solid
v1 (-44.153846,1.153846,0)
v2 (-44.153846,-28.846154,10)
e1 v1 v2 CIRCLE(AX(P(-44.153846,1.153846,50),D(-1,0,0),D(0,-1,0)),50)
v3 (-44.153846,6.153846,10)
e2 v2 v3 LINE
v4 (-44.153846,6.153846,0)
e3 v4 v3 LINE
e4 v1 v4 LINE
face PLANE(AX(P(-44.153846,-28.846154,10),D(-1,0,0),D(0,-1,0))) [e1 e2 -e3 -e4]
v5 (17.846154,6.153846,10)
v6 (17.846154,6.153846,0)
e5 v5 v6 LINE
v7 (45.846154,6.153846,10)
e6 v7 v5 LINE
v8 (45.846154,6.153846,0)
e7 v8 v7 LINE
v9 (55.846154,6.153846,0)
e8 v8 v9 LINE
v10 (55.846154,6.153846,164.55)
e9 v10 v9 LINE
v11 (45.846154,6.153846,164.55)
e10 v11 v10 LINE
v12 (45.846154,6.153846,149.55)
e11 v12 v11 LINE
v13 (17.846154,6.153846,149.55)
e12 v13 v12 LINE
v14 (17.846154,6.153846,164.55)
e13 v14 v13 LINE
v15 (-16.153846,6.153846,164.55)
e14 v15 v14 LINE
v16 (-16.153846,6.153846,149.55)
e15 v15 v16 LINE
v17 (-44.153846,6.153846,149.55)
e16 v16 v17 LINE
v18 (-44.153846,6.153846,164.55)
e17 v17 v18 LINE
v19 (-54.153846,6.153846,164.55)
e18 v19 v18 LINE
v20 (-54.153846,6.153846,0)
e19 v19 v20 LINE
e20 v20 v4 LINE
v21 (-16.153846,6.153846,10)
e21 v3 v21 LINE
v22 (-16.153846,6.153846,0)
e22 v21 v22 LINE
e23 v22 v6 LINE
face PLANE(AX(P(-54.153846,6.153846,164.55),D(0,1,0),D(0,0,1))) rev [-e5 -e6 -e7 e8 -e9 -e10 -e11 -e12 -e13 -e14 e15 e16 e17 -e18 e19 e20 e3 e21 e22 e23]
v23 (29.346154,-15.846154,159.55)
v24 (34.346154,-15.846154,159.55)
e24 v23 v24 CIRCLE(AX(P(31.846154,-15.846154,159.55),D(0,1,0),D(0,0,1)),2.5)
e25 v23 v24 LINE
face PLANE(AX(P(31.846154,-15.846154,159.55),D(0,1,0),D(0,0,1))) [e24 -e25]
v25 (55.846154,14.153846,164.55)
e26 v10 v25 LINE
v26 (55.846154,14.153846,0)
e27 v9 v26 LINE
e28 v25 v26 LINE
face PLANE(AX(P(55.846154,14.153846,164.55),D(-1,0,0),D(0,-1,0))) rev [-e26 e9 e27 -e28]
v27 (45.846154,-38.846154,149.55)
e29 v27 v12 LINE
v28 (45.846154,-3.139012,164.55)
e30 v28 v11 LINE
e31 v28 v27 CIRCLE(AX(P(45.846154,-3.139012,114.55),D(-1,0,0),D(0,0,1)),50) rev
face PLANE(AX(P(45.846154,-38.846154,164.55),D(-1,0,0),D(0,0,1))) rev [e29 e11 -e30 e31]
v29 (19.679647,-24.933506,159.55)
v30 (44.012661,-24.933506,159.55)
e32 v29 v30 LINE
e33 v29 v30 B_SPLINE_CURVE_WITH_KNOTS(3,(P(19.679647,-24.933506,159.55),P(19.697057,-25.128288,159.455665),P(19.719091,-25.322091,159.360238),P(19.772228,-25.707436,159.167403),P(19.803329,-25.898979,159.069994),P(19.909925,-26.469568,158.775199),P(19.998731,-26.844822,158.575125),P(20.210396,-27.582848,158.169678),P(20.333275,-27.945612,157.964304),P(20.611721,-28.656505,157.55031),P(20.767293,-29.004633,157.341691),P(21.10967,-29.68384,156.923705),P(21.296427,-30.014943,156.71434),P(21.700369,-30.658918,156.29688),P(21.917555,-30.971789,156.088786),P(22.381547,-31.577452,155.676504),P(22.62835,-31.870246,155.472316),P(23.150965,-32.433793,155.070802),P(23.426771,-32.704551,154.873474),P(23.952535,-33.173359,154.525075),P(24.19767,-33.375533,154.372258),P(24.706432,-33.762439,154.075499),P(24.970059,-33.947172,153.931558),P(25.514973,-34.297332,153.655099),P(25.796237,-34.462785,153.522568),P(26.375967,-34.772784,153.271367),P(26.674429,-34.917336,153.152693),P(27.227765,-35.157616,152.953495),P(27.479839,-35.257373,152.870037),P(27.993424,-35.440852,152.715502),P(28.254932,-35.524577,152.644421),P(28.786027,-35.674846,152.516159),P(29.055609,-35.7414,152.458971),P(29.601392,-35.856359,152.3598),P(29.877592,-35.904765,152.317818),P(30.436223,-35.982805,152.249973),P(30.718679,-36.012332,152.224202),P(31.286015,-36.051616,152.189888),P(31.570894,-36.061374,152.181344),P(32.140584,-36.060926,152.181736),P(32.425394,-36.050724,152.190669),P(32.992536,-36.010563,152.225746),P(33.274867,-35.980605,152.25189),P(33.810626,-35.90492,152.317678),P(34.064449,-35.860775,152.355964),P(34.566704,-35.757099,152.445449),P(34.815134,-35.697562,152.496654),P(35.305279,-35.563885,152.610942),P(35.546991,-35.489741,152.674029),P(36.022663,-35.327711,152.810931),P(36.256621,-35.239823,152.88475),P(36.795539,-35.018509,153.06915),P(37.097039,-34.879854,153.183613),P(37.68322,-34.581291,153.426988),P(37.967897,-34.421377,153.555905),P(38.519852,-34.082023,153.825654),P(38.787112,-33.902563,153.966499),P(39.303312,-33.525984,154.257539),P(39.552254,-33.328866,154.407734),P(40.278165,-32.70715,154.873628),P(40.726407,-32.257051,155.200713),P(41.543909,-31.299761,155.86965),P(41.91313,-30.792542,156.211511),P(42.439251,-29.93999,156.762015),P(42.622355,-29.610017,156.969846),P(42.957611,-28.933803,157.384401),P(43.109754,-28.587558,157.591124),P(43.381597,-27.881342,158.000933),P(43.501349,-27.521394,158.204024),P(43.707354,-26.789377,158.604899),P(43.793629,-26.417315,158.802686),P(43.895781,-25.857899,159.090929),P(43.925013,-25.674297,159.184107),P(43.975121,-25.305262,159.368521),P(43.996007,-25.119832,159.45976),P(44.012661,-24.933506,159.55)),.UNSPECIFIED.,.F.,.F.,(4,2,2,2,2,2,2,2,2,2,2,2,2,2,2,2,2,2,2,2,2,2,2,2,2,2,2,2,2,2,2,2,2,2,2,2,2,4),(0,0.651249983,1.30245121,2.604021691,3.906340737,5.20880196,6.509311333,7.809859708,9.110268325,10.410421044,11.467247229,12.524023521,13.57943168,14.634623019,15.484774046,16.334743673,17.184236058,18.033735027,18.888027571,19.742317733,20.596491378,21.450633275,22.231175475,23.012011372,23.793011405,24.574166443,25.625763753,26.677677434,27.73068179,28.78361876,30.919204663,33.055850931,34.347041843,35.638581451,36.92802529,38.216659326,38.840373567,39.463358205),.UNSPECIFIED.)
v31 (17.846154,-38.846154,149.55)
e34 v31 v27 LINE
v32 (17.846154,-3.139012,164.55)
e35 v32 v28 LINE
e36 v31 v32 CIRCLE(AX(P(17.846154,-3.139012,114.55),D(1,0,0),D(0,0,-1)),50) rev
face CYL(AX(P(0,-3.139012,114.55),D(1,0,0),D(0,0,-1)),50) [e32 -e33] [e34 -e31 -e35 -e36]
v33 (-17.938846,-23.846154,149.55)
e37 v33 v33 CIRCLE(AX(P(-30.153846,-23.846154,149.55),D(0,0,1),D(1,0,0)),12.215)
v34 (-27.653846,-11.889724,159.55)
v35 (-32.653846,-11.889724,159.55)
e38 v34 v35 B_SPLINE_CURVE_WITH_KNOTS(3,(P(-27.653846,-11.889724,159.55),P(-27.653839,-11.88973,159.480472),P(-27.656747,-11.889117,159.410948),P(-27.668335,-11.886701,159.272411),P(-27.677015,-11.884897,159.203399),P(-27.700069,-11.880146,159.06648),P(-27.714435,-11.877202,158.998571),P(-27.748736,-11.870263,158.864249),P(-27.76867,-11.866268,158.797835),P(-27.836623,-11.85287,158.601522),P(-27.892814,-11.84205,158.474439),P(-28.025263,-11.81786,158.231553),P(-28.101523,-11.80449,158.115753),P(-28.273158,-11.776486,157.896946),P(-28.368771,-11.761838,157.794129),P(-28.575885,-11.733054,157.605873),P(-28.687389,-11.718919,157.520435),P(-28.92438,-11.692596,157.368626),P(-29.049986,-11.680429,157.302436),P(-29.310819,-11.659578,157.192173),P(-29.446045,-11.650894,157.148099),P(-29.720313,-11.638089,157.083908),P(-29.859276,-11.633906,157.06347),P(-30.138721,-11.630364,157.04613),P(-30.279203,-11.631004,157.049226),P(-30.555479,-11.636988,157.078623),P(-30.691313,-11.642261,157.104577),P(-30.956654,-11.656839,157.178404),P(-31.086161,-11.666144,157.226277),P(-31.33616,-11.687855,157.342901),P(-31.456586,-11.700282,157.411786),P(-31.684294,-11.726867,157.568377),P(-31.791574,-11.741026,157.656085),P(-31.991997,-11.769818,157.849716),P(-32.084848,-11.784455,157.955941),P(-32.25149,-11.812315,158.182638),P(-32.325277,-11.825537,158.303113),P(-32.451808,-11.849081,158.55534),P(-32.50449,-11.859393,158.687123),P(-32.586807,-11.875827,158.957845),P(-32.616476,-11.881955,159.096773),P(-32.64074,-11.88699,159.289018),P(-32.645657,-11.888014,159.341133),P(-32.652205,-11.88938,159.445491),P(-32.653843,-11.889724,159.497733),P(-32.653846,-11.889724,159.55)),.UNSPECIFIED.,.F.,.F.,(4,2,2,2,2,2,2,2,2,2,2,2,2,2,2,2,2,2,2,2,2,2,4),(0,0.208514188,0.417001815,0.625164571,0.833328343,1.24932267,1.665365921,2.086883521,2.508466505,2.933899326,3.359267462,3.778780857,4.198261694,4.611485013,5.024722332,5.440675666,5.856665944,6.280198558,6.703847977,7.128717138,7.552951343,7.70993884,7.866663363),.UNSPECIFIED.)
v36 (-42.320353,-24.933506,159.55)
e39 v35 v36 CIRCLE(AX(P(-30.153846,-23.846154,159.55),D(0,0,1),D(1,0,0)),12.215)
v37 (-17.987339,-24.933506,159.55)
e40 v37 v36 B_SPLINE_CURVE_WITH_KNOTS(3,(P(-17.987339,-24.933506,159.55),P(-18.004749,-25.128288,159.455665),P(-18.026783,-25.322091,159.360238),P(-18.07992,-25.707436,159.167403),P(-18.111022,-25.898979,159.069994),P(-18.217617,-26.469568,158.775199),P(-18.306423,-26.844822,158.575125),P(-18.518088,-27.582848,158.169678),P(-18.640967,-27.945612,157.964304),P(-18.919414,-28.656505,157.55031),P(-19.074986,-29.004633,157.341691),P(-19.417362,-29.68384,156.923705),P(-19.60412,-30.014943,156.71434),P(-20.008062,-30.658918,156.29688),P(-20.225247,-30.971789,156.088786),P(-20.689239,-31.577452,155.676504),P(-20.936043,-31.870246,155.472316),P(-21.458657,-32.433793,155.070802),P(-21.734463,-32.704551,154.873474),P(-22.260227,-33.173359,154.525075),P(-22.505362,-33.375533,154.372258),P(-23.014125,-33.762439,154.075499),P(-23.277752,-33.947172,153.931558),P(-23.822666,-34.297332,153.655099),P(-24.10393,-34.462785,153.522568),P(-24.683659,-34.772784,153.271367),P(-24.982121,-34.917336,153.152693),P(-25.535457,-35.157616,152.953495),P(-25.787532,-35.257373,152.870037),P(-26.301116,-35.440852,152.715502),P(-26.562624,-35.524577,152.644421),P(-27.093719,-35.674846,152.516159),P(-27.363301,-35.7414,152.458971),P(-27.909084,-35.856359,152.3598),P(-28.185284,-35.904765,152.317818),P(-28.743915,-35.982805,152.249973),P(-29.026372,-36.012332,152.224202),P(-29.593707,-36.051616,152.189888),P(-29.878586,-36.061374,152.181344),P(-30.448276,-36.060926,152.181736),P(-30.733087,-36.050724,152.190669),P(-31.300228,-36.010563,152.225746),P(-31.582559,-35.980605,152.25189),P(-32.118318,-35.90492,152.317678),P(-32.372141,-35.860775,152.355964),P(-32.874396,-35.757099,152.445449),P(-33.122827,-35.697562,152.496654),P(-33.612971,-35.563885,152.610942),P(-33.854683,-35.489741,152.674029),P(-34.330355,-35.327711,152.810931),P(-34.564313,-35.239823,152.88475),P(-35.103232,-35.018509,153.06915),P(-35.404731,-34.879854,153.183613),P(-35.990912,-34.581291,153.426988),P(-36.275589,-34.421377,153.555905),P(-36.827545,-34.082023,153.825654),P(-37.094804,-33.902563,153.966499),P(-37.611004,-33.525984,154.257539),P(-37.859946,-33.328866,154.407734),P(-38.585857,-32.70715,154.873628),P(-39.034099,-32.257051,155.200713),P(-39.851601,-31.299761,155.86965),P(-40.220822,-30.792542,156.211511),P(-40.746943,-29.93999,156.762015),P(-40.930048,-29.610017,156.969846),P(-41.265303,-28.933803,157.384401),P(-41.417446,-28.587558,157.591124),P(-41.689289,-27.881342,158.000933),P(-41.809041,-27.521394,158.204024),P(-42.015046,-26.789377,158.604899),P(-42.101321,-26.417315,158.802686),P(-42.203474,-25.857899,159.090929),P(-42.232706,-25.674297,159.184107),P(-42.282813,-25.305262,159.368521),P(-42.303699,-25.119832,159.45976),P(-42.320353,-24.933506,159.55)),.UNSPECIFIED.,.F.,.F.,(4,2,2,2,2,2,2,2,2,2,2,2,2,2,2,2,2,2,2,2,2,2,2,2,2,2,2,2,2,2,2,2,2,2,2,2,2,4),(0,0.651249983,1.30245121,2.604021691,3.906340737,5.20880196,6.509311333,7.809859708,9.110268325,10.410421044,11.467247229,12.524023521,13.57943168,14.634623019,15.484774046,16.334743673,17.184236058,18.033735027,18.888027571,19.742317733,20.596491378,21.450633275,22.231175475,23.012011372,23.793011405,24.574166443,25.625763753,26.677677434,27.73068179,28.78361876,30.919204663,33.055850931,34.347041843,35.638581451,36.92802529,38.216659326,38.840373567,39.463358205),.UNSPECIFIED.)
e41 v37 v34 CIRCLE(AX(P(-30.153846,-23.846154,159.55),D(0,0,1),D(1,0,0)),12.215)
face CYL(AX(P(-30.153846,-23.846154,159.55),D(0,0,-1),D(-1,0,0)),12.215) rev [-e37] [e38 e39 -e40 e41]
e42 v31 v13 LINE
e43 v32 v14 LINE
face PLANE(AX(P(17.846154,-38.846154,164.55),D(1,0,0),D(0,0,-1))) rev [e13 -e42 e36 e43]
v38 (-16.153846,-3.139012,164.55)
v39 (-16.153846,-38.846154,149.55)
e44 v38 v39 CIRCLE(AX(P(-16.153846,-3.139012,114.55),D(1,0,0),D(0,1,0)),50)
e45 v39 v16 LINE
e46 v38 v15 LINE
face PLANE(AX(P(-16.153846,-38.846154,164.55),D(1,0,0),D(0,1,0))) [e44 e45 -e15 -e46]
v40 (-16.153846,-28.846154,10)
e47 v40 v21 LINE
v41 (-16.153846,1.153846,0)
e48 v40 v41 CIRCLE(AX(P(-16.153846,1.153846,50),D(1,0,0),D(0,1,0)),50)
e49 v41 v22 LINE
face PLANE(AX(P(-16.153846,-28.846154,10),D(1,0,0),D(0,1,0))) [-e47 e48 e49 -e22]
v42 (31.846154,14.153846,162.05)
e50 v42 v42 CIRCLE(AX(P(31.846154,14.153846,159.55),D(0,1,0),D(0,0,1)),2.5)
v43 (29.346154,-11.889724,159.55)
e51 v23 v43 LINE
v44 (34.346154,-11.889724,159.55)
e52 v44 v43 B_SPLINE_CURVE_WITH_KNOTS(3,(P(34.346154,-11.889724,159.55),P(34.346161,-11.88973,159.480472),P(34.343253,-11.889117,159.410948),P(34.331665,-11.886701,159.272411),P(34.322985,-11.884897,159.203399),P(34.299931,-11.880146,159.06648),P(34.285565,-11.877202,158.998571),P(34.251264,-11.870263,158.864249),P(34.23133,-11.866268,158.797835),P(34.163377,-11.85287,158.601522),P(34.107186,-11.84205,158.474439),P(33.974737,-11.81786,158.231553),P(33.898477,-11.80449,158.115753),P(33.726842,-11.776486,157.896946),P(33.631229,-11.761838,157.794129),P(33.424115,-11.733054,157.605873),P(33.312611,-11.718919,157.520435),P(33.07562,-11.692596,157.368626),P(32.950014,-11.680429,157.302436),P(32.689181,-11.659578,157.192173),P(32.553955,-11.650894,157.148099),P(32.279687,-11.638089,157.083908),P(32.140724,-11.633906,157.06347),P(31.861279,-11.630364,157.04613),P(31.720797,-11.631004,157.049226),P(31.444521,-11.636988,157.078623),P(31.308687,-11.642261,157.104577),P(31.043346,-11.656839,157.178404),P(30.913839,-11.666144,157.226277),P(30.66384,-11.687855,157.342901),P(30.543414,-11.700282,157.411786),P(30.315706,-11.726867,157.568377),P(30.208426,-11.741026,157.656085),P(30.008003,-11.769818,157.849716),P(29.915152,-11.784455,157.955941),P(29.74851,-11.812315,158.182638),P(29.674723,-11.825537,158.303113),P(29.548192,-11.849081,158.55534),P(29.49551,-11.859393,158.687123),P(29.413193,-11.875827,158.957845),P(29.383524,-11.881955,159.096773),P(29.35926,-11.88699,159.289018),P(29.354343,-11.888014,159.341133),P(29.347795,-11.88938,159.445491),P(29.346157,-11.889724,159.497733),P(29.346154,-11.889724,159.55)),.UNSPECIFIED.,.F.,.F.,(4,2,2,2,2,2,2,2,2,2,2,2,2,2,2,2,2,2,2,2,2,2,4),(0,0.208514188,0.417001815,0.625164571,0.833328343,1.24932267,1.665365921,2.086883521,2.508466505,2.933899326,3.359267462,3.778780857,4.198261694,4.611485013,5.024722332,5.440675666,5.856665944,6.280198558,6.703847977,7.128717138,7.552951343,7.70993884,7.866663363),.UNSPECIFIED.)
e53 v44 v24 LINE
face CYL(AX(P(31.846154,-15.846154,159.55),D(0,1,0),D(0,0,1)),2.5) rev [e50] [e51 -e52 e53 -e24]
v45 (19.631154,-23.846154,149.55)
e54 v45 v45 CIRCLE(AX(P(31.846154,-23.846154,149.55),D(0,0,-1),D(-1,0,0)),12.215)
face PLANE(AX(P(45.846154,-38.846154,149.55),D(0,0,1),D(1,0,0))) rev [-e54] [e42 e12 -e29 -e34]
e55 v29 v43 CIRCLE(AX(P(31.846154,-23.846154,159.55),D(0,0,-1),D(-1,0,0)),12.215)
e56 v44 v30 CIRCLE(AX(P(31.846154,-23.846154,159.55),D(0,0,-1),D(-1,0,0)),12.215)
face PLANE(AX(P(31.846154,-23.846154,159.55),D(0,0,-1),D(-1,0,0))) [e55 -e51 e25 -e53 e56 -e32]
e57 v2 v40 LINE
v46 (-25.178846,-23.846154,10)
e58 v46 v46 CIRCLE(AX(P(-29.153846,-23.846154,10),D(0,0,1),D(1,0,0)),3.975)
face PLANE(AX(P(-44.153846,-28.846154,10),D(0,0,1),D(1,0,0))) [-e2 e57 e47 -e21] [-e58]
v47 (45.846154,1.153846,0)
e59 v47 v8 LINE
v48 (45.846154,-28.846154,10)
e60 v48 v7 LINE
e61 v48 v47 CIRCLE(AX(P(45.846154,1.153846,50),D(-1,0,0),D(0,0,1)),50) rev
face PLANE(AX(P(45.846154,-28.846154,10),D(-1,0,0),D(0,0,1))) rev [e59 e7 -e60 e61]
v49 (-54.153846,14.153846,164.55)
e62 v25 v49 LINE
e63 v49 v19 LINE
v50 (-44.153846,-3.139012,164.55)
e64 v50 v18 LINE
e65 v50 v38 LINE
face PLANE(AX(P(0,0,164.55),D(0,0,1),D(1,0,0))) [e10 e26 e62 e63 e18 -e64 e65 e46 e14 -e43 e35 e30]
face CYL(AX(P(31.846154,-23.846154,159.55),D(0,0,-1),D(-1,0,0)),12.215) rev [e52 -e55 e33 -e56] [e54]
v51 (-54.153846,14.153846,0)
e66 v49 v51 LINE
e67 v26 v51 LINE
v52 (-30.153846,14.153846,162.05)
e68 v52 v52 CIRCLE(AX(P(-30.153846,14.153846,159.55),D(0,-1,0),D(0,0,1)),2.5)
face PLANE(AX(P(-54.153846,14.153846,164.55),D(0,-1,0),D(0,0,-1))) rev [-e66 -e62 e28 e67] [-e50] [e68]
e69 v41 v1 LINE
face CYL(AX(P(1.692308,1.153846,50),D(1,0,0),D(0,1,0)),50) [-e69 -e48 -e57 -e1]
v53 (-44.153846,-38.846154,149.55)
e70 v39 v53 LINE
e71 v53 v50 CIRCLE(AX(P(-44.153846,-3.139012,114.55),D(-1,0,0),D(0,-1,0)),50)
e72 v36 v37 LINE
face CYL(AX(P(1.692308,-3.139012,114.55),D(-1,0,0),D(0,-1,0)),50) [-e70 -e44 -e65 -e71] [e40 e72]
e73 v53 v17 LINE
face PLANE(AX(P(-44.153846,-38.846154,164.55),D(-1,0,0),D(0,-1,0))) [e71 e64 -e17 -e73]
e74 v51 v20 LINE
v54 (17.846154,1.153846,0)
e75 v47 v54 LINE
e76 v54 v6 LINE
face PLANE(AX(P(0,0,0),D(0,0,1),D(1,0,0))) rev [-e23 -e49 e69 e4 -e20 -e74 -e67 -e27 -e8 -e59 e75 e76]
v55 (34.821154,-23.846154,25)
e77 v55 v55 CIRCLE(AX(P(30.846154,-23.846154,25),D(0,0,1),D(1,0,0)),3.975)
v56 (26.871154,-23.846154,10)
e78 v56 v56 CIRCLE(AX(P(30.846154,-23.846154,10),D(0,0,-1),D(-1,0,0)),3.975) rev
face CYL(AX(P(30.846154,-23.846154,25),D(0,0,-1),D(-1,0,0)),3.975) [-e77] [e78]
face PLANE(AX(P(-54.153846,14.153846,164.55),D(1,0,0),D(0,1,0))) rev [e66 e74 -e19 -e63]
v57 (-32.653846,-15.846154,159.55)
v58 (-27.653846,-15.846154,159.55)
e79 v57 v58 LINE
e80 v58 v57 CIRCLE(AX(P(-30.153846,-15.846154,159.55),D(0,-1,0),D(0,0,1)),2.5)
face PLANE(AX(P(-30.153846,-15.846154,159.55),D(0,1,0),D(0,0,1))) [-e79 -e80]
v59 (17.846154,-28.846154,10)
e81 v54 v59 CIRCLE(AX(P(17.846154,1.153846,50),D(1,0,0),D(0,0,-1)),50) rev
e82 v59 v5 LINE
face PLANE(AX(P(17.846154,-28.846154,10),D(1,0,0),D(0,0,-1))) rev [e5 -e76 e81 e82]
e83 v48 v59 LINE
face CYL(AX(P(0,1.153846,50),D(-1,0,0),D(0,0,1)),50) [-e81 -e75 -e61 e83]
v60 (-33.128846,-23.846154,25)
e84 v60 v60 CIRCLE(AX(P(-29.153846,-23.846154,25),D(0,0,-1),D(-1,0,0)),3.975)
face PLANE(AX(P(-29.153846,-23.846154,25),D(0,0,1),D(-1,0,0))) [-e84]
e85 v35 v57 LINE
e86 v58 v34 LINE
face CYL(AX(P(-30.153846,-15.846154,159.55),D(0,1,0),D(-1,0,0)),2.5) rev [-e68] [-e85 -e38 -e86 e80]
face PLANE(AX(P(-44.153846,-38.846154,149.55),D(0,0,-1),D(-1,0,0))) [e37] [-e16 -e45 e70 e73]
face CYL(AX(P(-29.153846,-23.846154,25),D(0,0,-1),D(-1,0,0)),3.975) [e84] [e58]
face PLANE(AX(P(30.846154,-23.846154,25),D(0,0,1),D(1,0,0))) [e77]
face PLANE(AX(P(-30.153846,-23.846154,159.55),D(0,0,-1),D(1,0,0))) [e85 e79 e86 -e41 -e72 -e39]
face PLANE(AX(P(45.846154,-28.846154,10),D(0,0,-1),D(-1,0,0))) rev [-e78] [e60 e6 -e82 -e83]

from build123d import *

# Parameters (mm, degrees)
SKETCH_1_W             = 110
SKETCH_1_H             = 8
EXTRUDE_1_DEPTH        = 164.55
SKETCH_7_W             = 28
SKETCH_7_H             = 15
EXTRUDE_2_DEPTH        = 45
FILLET_1_R             = 50
SKETCH_10_R            = 12.215
CUT_EXTRUDE_3_DEPTH    = 10
SKETCH_11_R            = 2.5
CUT_EXTRUDE_4_DEPTH    = 30
FILLET_1_OF_MIRROR_1_R = 50
SKETCH_13_W            = 28
SKETCH_13_H            = 10
EXTRUDE_3_DEPTH        = 35
FILLET_2_R             = 50
SKETCH_14_R            = 3.975
EXTRUDE_4_DEPTH        = 15
MIRROR_START           = -44.153846154
MIRROR_2_DEPTH         = 28
MIRROR_START_2         = 10
MIRROR_2_2_OUTLINE_R   = 3.975
MIRROR_2_2_DEPTH       = 15


with BuildPart() as part:
    # Эскиз1 → Бобышка-Вытянуть1 (new body)
    with BuildSketch(Plane.XY):
        with Locations((0.846153846, 10.153846154)):
            Rectangle(SKETCH_1_W, SKETCH_1_H)
    extrude(amount=EXTRUDE_1_DEPTH)

    # Эскиз7 → Бобышка-Вытянуть2 (add)
    with BuildSketch(Plane.XZ.offset(-6.153846154)):
        with Locations((31.846153846, 157.05)):
            Rectangle(SKETCH_7_W, SKETCH_7_H)
    extrude_2 = extrude(amount=EXTRUDE_2_DEPTH)

    # Скругление1
    # the kernel refuses this fillet: 50 mm, written as the material it takes off along each edge
    with BuildSketch(Plane(origin=(135.114009203, -38.846153846, 164.55), x_dir=(0, 1, 0), z_dir=(-1, 0, 0))) as fillet_1_piece_1:
        with BuildLine():
            CenterArc((35.707142143, 50), FILLET_1_R, 224.427004001, 45.572995999)
            Line((0, 15), (-0.714142843, 14.3))
            ThreePointArc((-0.714142843, 14.3), (-1, 7.5), (-1, 0))
            Line((-1, 0), (0, -1))
            Line((0, -1), (35.707142143, -1))
            Line((35.707142143, -1), (35.707142143, 0))
        make_face()
    extrude(amount=206.535710714, mode=Mode.SUBTRACT)

    # Эскиз10 → Вырез-Вытянуть3 (cut)
    with BuildSketch(Plane(origin=(0, 0, 149.55), x_dir=(-1, 0, 0), z_dir=(0, 0, -1))):
        with Locations((-31.846153846, -23.846153846)):
            Circle(SKETCH_10_R)
    cut_extrude_3 = extrude(amount=-CUT_EXTRUDE_3_DEPTH, mode=Mode.SUBTRACT)

    # Эскиз11 → Вырез-Вытянуть4 (cut)
    with BuildSketch(Plane(origin=(0, 14.153846154, 0), x_dir=(1, 0, 0), z_dir=(0, 1, 0))):
        with Locations(Location((31.846153846, -159.55, 0), (0, 0, 270))):
            Circle(SKETCH_11_R)
    cut_extrude_4 = extrude(amount=-CUT_EXTRUDE_4_DEPTH, mode=Mode.SUBTRACT)

    # Зеркальное отражение1: Бобышка-Вытянуть2, Вырез-Вытянуть3, Вырез-Вытянуть4 across plane
    add(extrude_2.mirror(Plane.ZY.offset(-0.846153846)))
    add(cut_extrude_3.mirror(Plane.ZY.offset(-0.846153846)), mode=Mode.SUBTRACT)
    add(cut_extrude_4.mirror(Plane.ZY.offset(-0.846153846)), mode=Mode.SUBTRACT)

    # Скругление1 of Зеркальное отражение1
    # the kernel refuses this fillet: 50 mm, written as the material it takes off along each edge
    with BuildSketch(Plane(origin=(-133.421701511, -38.846153846, 164.55), x_dir=(0, 1, 0), z_dir=(1, 0, 0))) as fillet_1_of_mirror_1_piece_1:
        with BuildLine():
            CenterArc((35.707142143, -50), FILLET_1_OF_MIRROR_1_R, 90, 45.572995999)
            Line((0, -15), (-0.714142843, -14.3))
            ThreePointArc((-0.714142843, -14.3), (-1, -7.5), (-1, 0))
            Line((-1, 0), (0, 1))
            Line((0, 1), (35.707142143, 1))
            Line((35.707142143, 1), (35.707142143, 0))
        make_face()
    extrude(amount=206.535710714, mode=Mode.SUBTRACT)

    # Эскиз13 → Бобышка-Вытянуть3 (add)
    with BuildSketch(Plane(origin=(0, 6.153846154, 0), x_dir=(-1, 0, 0), z_dir=(0, -1, 0))):
        with Locations((-31.846153846, -5)):
            Rectangle(SKETCH_13_W, SKETCH_13_H)
    extrude(amount=EXTRUDE_3_DEPTH)

    # Скругление2
    # the kernel refuses this fillet: 50 mm, written as the material it takes off along each edge
    with BuildSketch(Plane(origin=(-57.153846154, -28.846153846, 0), x_dir=(0, 1, 0), z_dir=(1, 0, 0))) as fillet_2_piece_1:
        with BuildLine():
            CenterArc((30, 50), FILLET_2_R, 233.130102354, 36.869897646)
            Line((0, 10), (0, 0))
            Line((0, 0), (30, 0))
        make_face()
    extrude(amount=178, mode=Mode.SUBTRACT)

    # Эскиз14 → Бобышка-Вытянуть4 (add)
    with BuildSketch(Plane.XY.offset(10)):
        with Locations(Location((30.846153846, -23.846153846, 0), (0, 0, 180))):
            Circle(SKETCH_14_R)
    extrude(amount=EXTRUDE_4_DEPTH)

    # Зеркальное отражение2: read off the stored shape, not the designer's step
    # Зеркальное отражение2 outline → Зеркальное отражение2 (add)
    with BuildSketch(Plane.YZ.offset(MIRROR_START)):
        with BuildLine():
            Line((1.153846154, 0), (6.153846154, 0))
            Line((6.153846154, 0), (6.153846154, 10))
            Line((6.153846154, 10), (-28.846153846, 10))
            ThreePointArc((-28.846153846, 10), (-14.657542147, 2.565835097), (1.153846154, 0))
        make_face()
    extrude(amount=MIRROR_2_DEPTH)

    # Mirror 2 2 outline → Mirror 2 2 (add)
    with BuildSketch(Plane.XY.offset(MIRROR_START_2)):
        with Locations((-29.153846154, -23.846153846)):
            Circle(MIRROR_2_2_OUTLINE_R)
    extrude(amount=MIRROR_2_2_DEPTH)


solid = part.part
